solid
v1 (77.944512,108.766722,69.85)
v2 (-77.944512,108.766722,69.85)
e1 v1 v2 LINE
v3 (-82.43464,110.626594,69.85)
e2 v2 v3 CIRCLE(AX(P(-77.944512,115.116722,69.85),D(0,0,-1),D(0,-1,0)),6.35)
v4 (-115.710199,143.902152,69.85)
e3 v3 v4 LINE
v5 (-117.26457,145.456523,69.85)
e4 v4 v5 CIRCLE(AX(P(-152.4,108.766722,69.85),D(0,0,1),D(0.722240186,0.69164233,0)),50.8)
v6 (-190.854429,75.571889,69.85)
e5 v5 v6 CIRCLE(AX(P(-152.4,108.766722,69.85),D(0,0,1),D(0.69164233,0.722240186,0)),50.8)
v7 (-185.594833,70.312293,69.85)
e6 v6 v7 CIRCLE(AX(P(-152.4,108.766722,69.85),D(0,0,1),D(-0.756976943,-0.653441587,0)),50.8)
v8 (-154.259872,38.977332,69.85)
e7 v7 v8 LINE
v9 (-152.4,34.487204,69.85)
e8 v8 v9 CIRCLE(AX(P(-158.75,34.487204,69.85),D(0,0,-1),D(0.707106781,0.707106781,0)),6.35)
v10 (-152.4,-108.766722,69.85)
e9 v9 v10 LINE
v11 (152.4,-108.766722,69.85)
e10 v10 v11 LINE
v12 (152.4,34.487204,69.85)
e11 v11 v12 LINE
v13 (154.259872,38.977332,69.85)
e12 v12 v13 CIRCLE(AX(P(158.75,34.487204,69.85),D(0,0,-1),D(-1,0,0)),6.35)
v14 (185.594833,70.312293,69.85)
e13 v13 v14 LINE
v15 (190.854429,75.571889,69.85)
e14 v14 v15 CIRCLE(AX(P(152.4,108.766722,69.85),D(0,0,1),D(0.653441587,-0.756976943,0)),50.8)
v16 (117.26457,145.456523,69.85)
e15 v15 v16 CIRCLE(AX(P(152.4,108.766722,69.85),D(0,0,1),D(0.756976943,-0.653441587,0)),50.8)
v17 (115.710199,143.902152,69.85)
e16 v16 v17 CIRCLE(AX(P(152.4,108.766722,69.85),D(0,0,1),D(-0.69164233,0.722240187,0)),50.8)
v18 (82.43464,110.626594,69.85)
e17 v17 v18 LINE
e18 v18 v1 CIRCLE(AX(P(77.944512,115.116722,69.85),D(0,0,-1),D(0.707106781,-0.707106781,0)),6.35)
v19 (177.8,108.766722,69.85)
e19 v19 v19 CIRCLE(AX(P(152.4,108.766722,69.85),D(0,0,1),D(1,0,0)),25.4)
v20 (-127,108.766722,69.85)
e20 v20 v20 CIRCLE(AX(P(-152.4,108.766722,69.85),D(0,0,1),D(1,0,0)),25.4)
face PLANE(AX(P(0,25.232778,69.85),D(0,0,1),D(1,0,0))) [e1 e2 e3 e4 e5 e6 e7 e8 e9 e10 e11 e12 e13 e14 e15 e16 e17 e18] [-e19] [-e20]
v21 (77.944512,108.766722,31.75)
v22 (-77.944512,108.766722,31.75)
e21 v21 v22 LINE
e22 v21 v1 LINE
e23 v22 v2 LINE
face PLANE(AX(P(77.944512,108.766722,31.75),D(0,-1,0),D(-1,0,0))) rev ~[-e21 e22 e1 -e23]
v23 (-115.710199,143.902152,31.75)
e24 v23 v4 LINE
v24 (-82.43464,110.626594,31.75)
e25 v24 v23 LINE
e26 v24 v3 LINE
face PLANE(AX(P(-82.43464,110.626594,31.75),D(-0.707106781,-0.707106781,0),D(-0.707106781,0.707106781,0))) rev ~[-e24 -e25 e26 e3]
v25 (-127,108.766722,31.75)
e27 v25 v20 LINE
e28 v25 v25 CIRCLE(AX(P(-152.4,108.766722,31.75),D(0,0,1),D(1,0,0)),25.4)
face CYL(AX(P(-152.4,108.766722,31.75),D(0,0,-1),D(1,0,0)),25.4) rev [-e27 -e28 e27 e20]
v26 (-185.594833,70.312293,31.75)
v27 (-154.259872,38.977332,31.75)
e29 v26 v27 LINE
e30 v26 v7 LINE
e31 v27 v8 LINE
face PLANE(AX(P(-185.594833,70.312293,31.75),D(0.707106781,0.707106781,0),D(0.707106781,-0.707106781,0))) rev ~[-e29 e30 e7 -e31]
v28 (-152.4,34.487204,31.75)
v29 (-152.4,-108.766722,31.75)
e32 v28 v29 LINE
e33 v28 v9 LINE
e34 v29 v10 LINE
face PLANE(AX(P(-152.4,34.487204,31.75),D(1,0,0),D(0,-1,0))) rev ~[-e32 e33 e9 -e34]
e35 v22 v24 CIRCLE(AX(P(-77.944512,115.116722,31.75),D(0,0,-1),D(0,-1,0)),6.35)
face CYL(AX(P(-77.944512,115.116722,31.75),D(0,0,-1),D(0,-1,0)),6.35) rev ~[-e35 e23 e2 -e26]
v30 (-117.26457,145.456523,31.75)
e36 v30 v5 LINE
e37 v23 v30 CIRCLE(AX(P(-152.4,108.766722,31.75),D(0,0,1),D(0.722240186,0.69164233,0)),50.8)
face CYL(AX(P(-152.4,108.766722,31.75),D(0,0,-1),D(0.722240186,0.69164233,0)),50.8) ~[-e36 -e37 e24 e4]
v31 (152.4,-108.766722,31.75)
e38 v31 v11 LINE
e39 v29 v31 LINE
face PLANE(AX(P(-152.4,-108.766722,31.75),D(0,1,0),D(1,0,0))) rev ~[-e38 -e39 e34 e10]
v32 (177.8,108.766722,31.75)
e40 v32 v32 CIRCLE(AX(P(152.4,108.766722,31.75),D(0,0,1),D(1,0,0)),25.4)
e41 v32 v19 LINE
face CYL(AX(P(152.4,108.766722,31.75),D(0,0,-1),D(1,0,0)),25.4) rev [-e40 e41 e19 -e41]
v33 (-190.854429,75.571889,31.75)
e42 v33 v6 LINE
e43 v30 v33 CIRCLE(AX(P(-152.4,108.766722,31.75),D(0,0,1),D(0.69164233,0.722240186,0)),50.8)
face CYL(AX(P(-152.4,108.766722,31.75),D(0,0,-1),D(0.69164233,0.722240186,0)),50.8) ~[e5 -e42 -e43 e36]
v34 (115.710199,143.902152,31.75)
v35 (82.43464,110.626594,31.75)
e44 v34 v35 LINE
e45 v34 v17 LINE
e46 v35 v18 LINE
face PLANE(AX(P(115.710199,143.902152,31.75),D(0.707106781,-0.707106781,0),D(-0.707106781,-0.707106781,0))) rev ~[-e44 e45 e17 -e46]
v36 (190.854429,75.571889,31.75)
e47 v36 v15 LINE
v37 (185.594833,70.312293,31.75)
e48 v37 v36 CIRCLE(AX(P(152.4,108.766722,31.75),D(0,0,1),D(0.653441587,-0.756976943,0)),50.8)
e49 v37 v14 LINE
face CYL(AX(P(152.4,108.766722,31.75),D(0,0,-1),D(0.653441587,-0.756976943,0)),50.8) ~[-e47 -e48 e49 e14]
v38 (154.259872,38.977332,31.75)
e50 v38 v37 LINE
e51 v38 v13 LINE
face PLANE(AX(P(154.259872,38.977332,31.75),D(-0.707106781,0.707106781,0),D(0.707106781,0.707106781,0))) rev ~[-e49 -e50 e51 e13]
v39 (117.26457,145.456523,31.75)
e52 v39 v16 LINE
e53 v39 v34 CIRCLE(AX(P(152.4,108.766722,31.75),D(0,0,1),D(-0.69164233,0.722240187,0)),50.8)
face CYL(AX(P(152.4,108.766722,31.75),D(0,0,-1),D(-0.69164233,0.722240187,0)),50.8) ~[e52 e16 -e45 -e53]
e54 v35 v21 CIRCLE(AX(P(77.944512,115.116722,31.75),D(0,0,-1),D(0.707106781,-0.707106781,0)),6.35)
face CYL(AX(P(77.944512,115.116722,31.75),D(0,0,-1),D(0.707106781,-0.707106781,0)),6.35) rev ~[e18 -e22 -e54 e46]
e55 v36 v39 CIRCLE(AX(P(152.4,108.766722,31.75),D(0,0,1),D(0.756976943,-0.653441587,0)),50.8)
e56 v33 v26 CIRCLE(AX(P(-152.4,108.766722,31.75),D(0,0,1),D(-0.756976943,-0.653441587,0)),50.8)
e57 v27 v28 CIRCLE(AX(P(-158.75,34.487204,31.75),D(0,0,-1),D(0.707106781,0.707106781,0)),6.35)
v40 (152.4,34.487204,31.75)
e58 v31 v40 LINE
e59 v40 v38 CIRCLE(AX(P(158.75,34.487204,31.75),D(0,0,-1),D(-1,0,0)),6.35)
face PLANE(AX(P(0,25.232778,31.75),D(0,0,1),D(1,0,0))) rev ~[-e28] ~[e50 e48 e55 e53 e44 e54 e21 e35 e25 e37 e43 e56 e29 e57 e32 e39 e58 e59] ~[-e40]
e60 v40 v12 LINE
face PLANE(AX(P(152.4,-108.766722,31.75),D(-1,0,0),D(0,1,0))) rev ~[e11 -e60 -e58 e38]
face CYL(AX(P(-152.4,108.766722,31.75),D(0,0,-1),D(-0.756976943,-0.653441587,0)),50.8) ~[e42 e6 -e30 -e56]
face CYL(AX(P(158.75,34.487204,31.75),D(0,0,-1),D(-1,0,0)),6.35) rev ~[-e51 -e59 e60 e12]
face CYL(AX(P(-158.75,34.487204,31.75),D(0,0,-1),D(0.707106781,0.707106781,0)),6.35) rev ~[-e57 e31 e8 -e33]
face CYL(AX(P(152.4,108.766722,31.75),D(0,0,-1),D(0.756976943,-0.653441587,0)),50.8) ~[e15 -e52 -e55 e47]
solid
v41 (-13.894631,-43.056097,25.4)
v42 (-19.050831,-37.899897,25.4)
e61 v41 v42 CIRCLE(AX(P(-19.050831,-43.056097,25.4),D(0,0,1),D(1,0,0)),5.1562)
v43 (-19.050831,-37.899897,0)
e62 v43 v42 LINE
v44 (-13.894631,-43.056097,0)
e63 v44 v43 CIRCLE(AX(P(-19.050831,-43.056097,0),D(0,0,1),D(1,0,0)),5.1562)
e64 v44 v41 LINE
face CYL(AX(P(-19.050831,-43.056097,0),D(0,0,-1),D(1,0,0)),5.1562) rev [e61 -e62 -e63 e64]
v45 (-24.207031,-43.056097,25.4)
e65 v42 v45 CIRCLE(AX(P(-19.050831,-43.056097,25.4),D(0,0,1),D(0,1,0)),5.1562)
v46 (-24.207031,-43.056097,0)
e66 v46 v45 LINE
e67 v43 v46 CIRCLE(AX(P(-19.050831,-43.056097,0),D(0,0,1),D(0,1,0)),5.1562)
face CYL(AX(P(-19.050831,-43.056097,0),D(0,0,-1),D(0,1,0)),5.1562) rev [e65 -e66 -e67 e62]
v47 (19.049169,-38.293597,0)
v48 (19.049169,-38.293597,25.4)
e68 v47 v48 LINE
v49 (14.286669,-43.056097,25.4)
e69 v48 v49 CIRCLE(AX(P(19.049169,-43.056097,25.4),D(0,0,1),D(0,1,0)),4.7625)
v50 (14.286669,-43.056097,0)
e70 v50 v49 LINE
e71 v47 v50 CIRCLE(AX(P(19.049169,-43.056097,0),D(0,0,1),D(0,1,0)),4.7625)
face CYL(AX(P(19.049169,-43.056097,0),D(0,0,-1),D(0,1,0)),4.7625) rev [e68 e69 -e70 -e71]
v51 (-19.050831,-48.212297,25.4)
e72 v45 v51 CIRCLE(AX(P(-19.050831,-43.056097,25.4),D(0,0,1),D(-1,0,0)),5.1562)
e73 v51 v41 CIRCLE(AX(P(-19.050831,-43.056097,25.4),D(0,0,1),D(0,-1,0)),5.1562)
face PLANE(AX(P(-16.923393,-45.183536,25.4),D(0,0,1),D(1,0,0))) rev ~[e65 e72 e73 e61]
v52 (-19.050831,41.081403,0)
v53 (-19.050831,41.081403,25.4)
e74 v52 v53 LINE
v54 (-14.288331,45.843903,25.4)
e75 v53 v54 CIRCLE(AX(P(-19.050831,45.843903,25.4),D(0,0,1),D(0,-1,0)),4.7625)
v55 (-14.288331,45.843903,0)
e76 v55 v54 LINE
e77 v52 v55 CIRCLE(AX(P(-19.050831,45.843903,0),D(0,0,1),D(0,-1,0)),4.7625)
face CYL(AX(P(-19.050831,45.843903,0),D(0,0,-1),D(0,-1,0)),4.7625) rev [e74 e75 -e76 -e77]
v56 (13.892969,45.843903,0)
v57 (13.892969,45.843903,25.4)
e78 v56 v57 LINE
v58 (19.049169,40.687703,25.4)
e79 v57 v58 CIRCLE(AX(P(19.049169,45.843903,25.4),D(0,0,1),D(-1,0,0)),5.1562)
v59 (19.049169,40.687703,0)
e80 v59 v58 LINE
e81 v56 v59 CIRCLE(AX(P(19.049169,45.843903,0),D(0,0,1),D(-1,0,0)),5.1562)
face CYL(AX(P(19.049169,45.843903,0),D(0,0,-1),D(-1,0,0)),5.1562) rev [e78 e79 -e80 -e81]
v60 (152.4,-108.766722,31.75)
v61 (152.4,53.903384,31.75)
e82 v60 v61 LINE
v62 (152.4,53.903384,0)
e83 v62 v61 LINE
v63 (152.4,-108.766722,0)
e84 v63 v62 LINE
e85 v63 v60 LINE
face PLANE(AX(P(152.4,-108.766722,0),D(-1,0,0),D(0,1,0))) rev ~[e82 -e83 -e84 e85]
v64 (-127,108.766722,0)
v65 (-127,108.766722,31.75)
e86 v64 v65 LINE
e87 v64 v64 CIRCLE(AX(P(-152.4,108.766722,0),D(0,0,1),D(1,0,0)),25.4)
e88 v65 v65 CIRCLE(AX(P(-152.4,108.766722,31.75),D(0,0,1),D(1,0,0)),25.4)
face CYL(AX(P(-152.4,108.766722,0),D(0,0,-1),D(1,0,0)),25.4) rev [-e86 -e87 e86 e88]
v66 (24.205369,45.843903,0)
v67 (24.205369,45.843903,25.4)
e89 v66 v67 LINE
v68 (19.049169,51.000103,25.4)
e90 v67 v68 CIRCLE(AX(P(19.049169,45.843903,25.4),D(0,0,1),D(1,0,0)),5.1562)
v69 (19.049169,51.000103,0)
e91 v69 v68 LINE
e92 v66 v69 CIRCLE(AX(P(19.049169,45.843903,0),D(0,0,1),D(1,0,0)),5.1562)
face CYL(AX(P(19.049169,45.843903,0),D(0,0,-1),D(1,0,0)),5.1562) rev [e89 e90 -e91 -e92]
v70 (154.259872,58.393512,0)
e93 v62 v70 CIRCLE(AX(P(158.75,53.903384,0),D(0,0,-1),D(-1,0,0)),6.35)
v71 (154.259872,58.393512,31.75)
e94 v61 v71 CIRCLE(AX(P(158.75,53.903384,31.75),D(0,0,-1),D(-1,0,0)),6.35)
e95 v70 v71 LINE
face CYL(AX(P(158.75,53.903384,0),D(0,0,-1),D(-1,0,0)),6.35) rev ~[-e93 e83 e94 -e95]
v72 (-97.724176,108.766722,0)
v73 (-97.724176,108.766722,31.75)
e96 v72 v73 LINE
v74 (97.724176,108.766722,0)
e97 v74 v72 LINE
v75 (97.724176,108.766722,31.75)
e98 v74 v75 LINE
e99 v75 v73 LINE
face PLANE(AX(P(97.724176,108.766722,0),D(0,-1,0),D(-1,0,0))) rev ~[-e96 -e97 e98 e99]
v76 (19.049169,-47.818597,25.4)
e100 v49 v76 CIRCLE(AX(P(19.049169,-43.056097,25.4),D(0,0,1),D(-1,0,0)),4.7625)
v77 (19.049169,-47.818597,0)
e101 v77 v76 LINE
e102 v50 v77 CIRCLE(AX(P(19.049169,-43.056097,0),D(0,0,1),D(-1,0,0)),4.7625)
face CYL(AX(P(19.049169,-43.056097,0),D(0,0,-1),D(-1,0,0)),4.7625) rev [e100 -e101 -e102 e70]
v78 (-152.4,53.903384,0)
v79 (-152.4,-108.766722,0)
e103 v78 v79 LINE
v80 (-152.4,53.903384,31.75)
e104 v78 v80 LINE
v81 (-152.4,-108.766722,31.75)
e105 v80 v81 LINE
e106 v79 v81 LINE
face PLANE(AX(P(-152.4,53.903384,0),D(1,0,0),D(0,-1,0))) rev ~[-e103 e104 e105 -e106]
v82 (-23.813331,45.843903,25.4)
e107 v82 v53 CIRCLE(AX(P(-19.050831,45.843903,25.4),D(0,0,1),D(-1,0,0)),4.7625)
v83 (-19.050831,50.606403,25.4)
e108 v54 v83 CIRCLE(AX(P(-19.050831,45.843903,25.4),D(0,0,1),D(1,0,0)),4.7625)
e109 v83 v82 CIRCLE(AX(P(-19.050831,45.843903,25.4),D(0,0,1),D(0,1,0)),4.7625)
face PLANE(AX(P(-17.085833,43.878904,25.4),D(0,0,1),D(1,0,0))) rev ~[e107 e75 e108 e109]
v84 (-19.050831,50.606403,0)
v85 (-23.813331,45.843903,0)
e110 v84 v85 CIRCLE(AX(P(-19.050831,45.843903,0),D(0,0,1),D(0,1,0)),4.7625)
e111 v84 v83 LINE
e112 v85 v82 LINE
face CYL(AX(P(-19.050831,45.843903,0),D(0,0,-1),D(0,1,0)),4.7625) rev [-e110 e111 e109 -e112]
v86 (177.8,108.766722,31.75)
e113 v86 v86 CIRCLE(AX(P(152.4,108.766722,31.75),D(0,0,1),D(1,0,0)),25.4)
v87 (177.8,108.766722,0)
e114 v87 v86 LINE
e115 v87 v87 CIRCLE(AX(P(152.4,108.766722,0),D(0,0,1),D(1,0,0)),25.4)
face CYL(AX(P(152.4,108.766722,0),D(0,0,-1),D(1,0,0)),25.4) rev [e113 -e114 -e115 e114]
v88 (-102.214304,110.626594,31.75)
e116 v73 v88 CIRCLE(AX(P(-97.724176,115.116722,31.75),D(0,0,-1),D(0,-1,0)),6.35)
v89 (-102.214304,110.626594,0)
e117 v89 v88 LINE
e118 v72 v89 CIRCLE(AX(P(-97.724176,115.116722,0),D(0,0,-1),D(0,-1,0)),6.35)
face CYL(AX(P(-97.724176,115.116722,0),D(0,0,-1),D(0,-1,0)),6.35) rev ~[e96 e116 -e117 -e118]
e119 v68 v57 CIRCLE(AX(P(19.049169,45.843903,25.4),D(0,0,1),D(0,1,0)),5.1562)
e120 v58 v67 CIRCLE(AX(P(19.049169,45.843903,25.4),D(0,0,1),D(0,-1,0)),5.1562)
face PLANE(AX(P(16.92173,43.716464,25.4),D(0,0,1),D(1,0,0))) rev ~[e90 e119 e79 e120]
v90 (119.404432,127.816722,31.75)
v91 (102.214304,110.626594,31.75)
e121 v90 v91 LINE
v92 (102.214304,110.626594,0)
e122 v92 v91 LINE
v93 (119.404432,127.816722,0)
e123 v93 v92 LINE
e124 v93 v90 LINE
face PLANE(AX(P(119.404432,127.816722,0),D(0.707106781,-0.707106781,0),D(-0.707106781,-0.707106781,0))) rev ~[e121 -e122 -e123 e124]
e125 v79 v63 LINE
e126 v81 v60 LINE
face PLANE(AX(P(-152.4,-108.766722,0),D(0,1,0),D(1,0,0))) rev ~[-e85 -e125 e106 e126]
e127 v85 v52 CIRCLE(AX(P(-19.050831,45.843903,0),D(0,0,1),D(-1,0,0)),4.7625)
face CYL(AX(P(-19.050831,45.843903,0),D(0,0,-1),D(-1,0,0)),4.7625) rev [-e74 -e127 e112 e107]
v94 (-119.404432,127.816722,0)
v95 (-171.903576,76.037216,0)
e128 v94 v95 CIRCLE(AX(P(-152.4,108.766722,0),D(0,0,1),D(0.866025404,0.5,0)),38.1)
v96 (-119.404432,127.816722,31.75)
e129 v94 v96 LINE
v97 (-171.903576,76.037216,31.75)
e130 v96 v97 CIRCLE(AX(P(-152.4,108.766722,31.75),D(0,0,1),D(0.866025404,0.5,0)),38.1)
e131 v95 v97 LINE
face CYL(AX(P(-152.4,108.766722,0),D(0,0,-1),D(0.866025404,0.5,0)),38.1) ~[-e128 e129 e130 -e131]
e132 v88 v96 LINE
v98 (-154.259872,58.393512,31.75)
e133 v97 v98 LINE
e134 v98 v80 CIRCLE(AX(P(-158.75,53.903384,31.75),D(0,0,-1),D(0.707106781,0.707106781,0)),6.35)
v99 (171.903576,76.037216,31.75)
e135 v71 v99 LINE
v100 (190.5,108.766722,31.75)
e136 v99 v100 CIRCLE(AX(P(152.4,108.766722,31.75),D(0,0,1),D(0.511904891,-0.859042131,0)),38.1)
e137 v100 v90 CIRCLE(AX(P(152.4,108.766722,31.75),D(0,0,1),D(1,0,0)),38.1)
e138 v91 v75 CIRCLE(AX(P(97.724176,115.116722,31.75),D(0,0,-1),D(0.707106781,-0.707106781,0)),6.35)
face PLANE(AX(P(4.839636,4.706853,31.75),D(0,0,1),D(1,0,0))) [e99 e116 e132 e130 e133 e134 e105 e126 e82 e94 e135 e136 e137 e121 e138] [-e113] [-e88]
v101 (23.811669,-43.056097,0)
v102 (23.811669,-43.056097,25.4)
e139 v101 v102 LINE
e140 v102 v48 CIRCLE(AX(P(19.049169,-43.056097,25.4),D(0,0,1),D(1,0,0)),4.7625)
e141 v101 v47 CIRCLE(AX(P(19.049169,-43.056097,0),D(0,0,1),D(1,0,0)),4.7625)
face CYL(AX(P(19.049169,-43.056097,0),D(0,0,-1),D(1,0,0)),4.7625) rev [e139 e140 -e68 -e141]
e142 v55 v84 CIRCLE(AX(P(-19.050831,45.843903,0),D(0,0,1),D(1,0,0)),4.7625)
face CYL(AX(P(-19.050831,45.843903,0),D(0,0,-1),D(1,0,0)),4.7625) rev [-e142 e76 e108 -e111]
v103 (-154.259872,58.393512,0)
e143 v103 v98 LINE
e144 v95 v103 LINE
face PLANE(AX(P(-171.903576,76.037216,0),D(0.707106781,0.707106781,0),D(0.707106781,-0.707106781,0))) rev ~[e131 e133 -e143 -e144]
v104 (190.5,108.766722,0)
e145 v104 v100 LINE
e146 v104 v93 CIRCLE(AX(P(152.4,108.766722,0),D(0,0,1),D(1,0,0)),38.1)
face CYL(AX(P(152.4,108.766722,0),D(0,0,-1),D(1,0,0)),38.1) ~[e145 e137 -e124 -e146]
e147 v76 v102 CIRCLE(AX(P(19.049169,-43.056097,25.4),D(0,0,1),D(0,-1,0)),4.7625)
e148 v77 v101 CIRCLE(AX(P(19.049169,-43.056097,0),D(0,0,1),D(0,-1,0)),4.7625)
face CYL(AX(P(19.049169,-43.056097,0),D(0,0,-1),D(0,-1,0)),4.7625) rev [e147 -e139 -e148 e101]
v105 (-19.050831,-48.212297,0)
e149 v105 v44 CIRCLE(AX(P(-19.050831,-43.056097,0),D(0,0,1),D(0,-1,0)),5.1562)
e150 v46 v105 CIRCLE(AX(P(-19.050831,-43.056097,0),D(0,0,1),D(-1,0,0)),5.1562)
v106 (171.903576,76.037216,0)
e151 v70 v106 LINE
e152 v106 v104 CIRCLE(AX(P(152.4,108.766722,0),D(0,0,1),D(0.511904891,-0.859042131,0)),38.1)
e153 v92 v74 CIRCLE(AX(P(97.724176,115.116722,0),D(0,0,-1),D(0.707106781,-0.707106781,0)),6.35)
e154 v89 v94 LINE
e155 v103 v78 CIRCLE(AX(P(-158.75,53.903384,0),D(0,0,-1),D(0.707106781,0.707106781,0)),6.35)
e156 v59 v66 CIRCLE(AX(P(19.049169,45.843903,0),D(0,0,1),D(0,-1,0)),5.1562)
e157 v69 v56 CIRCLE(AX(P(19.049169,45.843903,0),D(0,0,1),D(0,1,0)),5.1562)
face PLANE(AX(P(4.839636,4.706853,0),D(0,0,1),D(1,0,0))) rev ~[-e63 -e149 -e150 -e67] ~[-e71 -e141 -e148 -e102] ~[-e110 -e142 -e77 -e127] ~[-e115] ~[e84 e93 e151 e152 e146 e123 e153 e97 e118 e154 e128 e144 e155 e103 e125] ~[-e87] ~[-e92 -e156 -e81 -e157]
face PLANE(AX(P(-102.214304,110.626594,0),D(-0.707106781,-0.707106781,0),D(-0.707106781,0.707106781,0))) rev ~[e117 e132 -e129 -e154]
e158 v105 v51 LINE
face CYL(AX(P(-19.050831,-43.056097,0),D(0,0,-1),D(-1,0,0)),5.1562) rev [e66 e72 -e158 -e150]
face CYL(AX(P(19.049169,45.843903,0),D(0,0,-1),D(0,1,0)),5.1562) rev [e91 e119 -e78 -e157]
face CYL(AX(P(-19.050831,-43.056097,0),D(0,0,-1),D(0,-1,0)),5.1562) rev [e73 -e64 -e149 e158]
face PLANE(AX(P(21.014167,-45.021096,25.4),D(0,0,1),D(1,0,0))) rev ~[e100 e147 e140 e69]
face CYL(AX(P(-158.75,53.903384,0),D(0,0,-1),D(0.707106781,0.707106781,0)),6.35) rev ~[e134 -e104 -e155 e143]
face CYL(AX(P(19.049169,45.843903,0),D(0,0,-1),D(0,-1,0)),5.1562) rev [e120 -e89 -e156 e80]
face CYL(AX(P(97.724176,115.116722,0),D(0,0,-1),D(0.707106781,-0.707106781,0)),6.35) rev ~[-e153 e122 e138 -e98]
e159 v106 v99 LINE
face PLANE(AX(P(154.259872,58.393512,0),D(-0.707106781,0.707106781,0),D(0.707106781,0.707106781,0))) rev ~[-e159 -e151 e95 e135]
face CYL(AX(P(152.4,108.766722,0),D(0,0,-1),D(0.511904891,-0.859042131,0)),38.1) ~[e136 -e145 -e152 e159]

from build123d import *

# Parameters (mm, degrees)
F0_R     = 25.4
F1_DEPTH = 31.75
F4_R     = 25.4
F5_DEPTH = 38.1
F7_DEPTH = 25.4


with BuildPart() as f1:
    # F0 (on Top) → F1 (new body)
    with BuildSketch(Plane.XY):
        with BuildLine():
            Line((-152.4, 53.9033839703), (-152.4, -108.7667216295))
            Line((-152.4, -108.7667216295), (152.4, -108.7667216295))
            Line((152.4, -108.7667216295), (152.4, 53.9033839703))
            ThreePointArc((152.4, 53.9033839703), (152.8833649686, 56.3334237658), (154.2598719395, 58.3935120309))
            Line((154.2598719395, 58.3935120309), (171.9035763614, 76.0372164528))
            ThreePointArc((171.9035763614, 76.0372164528), (125.6457900901, 81.6406778321), (119.4044321158, 127.8167216295))
            Line((119.4044321158, 127.8167216295), (102.2143040553, 110.626593569))
            ThreePointArc((102.2143040553, 110.626593569), (100.1542157903, 109.2500865981), (97.7241759947, 108.7667216295))
            Line((97.7241759947, 108.7667216295), (-97.7241759947, 108.7667216295))
            ThreePointArc((-97.7241759947, 108.7667216295), (-100.1542157903, 109.2500865981), (-102.2143040553, 110.626593569))
            Line((-102.2143040553, 110.626593569), (-119.4044321158, 127.8167216295))
            ThreePointArc((-119.4044321158, 127.8167216295), (-115.5982260184, 118.6277272479), (-114.3, 108.7667216295))
            ThreePointArc((-114.3, 108.7667216295), (-125.4592316368, 81.8259532663), (-152.4, 70.6667216295))
            Line((-152.4, 70.6667216295), (-152.4, 53.9033839703))
        make_face()
        with BuildLine():
            ThreePointArc((-171.9035763614, 76.0372164528), (-162.5147380778, 72.0338742907), (-152.4, 70.6667216295))
            ThreePointArc((-152.4, 70.6667216295), (-125.4592316368, 81.8259532663), (-114.3, 108.7667216295))
            ThreePointArc((-114.3, 108.7667216295), (-115.5982260184, 118.6277272479), (-119.4044321158, 127.8167216295))
            ThreePointArc((-119.4044321158, 127.8167216295), (-179.1542099099, 135.8927654269), (-171.9035763614, 76.0372164528))
        make_face()
        with Locations((-152.4, 108.7667216295)):
            Circle(F0_R, mode=Mode.SUBTRACT)
        with BuildLine():
            ThreePointArc((119.4044321158, 127.8167216295), (125.6457900901, 81.6406778321), (171.9035763614, 76.0372164528))
            ThreePointArc((171.9035763614, 76.0372164528), (185.5262453303, 89.9448760687), (190.5, 108.7667216295))
            ThreePointArc((190.5, 108.7667216295), (162.2610056184, 145.5684956111), (119.4044321158, 127.8167216295))
        make_face()
        with Locations((152.4, 108.7667216295)):
            Circle(F0_R, mode=Mode.SUBTRACT)
        with BuildLine():
            ThreePointArc((-154.2598719395, 58.3935120309), (-152.8833649686, 56.3334237658), (-152.4, 53.9033839703))
            Line((-152.4, 53.9033839703), (-152.4, 70.6667216295))
            ThreePointArc((-152.4, 70.6667216295), (-162.5147380778, 72.0338742907), (-171.9035763614, 76.0372164528))
            Line((-171.9035763614, 76.0372164528), (-154.2598719395, 58.3935120309))
        make_face()
    extrude(amount=F1_DEPTH)


with BuildPart() as f2_1:
    # F2: copy of F1
    add(f1.part)


with BuildPart() as f5:
    # F4 (on face) → F5 (new body)
    with BuildSketch(Plane.XY.offset(31.75)):
        with BuildLine():
            Line((-152.4, -108.7667216295), (152.4, -108.7667216295))
            Line((152.4, -108.7667216295), (152.4, 34.487204177))
            ThreePointArc((152.4, 34.487204177), (152.8833649686, 36.9172439725), (154.2598719395, 38.9773322375))
            Line((154.2598719395, 38.9773322375), (185.5948326386, 70.3122929367))
            Line((185.5948326386, 70.3122929367), (190.8544286929, 75.5718889909))
            ThreePointArc((190.8544286929, 75.5718889909), (187.3817017696, 145.6031240231), (117.2645696221, 145.4565231029))
            Line((117.2645696221, 145.4565231029), (115.7101985266, 143.9021520075))
            Line((115.7101985266, 143.9021520075), (82.4346400881, 110.626593569))
            ThreePointArc((82.4346400881, 110.626593569), (80.3745518231, 109.2500865981), (77.9445120276, 108.7667216295))
            Line((77.9445120276, 108.7667216295), (-77.9445120276, 108.7667216295))
            ThreePointArc((-77.9445120276, 108.7667216295), (-80.3745518231, 109.2500865981), (-82.4346400881, 110.626593569))
            Line((-82.4346400881, 110.626593569), (-115.7101985266, 143.9021520075))
            Line((-115.7101985266, 143.9021520075), (-117.2645696221, 145.4565231029))
            ThreePointArc((-117.2645696221, 145.4565231029), (-187.3817017696, 145.6031240231), (-190.8544286929, 75.5718889909))
            Line((-190.8544286929, 75.5718889909), (-185.5948326386, 70.3122929367))
            Line((-185.5948326386, 70.3122929367), (-154.2598719395, 38.9773322375))
            ThreePointArc((-154.2598719395, 38.9773322375), (-152.8833649686, 36.9172439725), (-152.4, 34.487204177))
            Line((-152.4, 34.487204177), (-152.4, -108.7667216295))
        make_face()
        with Locations((-152.4, 108.7667216295)):
            Circle(F4_R, mode=Mode.SUBTRACT)
        with Locations((152.4, 108.7667216295)):
            Circle(F4_R, mode=Mode.SUBTRACT)
        with BuildLine():
            Line((190.8544286929, 75.5718889909), (185.5948326386, 70.3122929367))
            ThreePointArc((185.5948326386, 70.3122929367), (188.3210244843, 72.8456971453), (190.8544286929, 75.5718889909))
        make_face()
        with BuildLine():
            ThreePointArc((-190.8544286929, 75.5718889909), (-188.3210244843, 72.8456971453), (-185.5948326386, 70.3122929367))
            Line((-185.5948326386, 70.3122929367), (-190.8544286929, 75.5718889909))
        make_face()
        with BuildLine():
            Line((115.7101985266, 143.9021520075), (117.2645696221, 145.4565231029))
            ThreePointArc((117.2645696221, 145.4565231029), (116.4789755157, 144.6877461138), (115.7101985266, 143.9021520075))
        make_face()
        with BuildLine():
            ThreePointArc((-115.7101985266, 143.9021520075), (-116.4789755157, 144.6877461138), (-117.2645696221, 145.4565231029))
            Line((-117.2645696221, 145.4565231029), (-115.7101985266, 143.9021520075))
        make_face()
    extrude(amount=F5_DEPTH)


with BuildPart() as f1_1:
    add(f1.part)

    # F6 (on Top) → F7 (cut)
    with BuildSketch(Plane.XY):
        with BuildLine():
            ThreePointArc((-19.050831298, -48.2122973633), (-15.4048473129, -46.7020813484), (-13.894631298, -43.0560973633))
            Line((-13.894631298, -43.0560973633), (-19.050831298, -43.0560973633))
            Line((-19.050831298, -43.0560973633), (-19.050831298, -48.2122973633))
        make_face()
        with BuildLine():
            ThreePointArc((-24.207031298, -43.0560973633), (-22.6968152832, -46.7020813484), (-19.050831298, -48.2122973633))
            Line((-19.050831298, -48.2122973633), (-19.050831298, -43.0560973633))
            Line((-19.050831298, -43.0560973633), (-24.207031298, -43.0560973633))
        make_face()
        with BuildLine():
            Line((-24.207031298, -43.0560973633), (-19.050831298, -43.0560973633))
            Line((-19.050831298, -43.0560973633), (-19.050831298, -37.8998973633))
            ThreePointArc((-19.050831298, -37.8998973633), (-22.6968152832, -39.4101133781), (-24.207031298, -43.0560973633))
        make_face()
        with BuildLine():
            Line((-19.050831298, -43.0560973633), (-13.894631298, -43.0560973633))
            ThreePointArc((-13.894631298, -43.0560973633), (-15.4048473129, -39.4101133781), (-19.050831298, -37.8998973633))
            Line((-19.050831298, -37.8998973633), (-19.050831298, -43.0560973633))
        make_face()
        with BuildLine():
            ThreePointArc((19.049168702, -47.8185973633), (22.4167647474, -46.4236934087), (23.811668702, -43.0560973633))
            Line((23.811668702, -43.0560973633), (19.049168702, -43.0560973633))
            Line((19.049168702, -43.0560973633), (19.049168702, -47.8185973633))
        make_face()
        with BuildLine():
            Line((19.049168702, -47.8185973633), (19.049168702, -43.0560973633))
            Line((19.049168702, -43.0560973633), (14.286668702, -43.0560973633))
            ThreePointArc((14.286668702, -43.0560973633), (15.6815726566, -46.4236934087), (19.049168702, -47.8185973633))
        make_face()
        with BuildLine():
            Line((14.286668702, -43.0560973633), (19.049168702, -43.0560973633))
            Line((19.049168702, -43.0560973633), (19.049168702, -38.2935973633))
            ThreePointArc((19.049168702, -38.2935973633), (15.6815726566, -39.6885013179), (14.286668702, -43.0560973633))
        make_face()
        with BuildLine():
            Line((19.049168702, -43.0560973633), (23.811668702, -43.0560973633))
            ThreePointArc((23.811668702, -43.0560973633), (22.4167647474, -39.6885013179), (19.049168702, -38.2935973633))
            Line((19.049168702, -38.2935973633), (19.049168702, -43.0560973633))
        make_face()
        with BuildLine():
            Line((19.049168702, 40.6877026367), (19.049168702, 45.8439026367))
            Line((19.049168702, 45.8439026367), (13.892968702, 45.8439026367))
            ThreePointArc((13.892968702, 45.8439026367), (15.4031847168, 42.1979186516), (19.049168702, 40.6877026367))
        make_face()
        with BuildLine():
            Line((19.049168702, 45.8439026367), (19.049168702, 51.0001026367))
            ThreePointArc((19.049168702, 51.0001026367), (15.4031847168, 49.4898866219), (13.892968702, 45.8439026367))
            Line((13.892968702, 45.8439026367), (19.049168702, 45.8439026367))
        make_face()
        with BuildLine():
            Line((19.049168702, 45.8439026367), (24.205368702, 45.8439026367))
            ThreePointArc((24.205368702, 45.8439026367), (22.6951526871, 49.4898866219), (19.049168702, 51.0001026367))
            Line((19.049168702, 51.0001026367), (19.049168702, 45.8439026367))
        make_face()
        with BuildLine():
            ThreePointArc((19.049168702, 40.6877026367), (22.6951526871, 42.1979186516), (24.205368702, 45.8439026367))
            Line((24.205368702, 45.8439026367), (19.049168702, 45.8439026367))
            Line((19.049168702, 45.8439026367), (19.049168702, 40.6877026367))
        make_face()
        with BuildLine():
            Line((-14.288331298, 45.8439026367), (-19.050831298, 45.8439026367))
            Line((-19.050831298, 45.8439026367), (-19.050831298, 41.0814026367))
            ThreePointArc((-19.050831298, 41.0814026367), (-15.6832352526, 42.4763065913), (-14.288331298, 45.8439026367))
        make_face()
        with BuildLine():
            ThreePointArc((-14.288331298, 45.8439026367), (-15.6832352526, 49.2114986821), (-19.050831298, 50.6064026367))
            Line((-19.050831298, 50.6064026367), (-19.050831298, 45.8439026367))
            Line((-19.050831298, 45.8439026367), (-14.288331298, 45.8439026367))
        make_face()
        with BuildLine():
            Line((-19.050831298, 45.8439026367), (-19.050831298, 50.6064026367))
            ThreePointArc((-19.050831298, 50.6064026367), (-22.4184273434, 49.2114986821), (-23.813331298, 45.8439026367))
            Line((-23.813331298, 45.8439026367), (-19.050831298, 45.8439026367))
        make_face()
        with BuildLine():
            Line((-19.050831298, 41.0814026367), (-19.050831298, 45.8439026367))
            Line((-19.050831298, 45.8439026367), (-23.813331298, 45.8439026367))
            ThreePointArc((-23.813331298, 45.8439026367), (-22.4184273434, 42.4763065913), (-19.050831298, 41.0814026367))
        make_face()
    extrude(amount=F7_DEPTH, mode=Mode.SUBTRACT)


solid = Compound([f5.part, f1_1.part])
